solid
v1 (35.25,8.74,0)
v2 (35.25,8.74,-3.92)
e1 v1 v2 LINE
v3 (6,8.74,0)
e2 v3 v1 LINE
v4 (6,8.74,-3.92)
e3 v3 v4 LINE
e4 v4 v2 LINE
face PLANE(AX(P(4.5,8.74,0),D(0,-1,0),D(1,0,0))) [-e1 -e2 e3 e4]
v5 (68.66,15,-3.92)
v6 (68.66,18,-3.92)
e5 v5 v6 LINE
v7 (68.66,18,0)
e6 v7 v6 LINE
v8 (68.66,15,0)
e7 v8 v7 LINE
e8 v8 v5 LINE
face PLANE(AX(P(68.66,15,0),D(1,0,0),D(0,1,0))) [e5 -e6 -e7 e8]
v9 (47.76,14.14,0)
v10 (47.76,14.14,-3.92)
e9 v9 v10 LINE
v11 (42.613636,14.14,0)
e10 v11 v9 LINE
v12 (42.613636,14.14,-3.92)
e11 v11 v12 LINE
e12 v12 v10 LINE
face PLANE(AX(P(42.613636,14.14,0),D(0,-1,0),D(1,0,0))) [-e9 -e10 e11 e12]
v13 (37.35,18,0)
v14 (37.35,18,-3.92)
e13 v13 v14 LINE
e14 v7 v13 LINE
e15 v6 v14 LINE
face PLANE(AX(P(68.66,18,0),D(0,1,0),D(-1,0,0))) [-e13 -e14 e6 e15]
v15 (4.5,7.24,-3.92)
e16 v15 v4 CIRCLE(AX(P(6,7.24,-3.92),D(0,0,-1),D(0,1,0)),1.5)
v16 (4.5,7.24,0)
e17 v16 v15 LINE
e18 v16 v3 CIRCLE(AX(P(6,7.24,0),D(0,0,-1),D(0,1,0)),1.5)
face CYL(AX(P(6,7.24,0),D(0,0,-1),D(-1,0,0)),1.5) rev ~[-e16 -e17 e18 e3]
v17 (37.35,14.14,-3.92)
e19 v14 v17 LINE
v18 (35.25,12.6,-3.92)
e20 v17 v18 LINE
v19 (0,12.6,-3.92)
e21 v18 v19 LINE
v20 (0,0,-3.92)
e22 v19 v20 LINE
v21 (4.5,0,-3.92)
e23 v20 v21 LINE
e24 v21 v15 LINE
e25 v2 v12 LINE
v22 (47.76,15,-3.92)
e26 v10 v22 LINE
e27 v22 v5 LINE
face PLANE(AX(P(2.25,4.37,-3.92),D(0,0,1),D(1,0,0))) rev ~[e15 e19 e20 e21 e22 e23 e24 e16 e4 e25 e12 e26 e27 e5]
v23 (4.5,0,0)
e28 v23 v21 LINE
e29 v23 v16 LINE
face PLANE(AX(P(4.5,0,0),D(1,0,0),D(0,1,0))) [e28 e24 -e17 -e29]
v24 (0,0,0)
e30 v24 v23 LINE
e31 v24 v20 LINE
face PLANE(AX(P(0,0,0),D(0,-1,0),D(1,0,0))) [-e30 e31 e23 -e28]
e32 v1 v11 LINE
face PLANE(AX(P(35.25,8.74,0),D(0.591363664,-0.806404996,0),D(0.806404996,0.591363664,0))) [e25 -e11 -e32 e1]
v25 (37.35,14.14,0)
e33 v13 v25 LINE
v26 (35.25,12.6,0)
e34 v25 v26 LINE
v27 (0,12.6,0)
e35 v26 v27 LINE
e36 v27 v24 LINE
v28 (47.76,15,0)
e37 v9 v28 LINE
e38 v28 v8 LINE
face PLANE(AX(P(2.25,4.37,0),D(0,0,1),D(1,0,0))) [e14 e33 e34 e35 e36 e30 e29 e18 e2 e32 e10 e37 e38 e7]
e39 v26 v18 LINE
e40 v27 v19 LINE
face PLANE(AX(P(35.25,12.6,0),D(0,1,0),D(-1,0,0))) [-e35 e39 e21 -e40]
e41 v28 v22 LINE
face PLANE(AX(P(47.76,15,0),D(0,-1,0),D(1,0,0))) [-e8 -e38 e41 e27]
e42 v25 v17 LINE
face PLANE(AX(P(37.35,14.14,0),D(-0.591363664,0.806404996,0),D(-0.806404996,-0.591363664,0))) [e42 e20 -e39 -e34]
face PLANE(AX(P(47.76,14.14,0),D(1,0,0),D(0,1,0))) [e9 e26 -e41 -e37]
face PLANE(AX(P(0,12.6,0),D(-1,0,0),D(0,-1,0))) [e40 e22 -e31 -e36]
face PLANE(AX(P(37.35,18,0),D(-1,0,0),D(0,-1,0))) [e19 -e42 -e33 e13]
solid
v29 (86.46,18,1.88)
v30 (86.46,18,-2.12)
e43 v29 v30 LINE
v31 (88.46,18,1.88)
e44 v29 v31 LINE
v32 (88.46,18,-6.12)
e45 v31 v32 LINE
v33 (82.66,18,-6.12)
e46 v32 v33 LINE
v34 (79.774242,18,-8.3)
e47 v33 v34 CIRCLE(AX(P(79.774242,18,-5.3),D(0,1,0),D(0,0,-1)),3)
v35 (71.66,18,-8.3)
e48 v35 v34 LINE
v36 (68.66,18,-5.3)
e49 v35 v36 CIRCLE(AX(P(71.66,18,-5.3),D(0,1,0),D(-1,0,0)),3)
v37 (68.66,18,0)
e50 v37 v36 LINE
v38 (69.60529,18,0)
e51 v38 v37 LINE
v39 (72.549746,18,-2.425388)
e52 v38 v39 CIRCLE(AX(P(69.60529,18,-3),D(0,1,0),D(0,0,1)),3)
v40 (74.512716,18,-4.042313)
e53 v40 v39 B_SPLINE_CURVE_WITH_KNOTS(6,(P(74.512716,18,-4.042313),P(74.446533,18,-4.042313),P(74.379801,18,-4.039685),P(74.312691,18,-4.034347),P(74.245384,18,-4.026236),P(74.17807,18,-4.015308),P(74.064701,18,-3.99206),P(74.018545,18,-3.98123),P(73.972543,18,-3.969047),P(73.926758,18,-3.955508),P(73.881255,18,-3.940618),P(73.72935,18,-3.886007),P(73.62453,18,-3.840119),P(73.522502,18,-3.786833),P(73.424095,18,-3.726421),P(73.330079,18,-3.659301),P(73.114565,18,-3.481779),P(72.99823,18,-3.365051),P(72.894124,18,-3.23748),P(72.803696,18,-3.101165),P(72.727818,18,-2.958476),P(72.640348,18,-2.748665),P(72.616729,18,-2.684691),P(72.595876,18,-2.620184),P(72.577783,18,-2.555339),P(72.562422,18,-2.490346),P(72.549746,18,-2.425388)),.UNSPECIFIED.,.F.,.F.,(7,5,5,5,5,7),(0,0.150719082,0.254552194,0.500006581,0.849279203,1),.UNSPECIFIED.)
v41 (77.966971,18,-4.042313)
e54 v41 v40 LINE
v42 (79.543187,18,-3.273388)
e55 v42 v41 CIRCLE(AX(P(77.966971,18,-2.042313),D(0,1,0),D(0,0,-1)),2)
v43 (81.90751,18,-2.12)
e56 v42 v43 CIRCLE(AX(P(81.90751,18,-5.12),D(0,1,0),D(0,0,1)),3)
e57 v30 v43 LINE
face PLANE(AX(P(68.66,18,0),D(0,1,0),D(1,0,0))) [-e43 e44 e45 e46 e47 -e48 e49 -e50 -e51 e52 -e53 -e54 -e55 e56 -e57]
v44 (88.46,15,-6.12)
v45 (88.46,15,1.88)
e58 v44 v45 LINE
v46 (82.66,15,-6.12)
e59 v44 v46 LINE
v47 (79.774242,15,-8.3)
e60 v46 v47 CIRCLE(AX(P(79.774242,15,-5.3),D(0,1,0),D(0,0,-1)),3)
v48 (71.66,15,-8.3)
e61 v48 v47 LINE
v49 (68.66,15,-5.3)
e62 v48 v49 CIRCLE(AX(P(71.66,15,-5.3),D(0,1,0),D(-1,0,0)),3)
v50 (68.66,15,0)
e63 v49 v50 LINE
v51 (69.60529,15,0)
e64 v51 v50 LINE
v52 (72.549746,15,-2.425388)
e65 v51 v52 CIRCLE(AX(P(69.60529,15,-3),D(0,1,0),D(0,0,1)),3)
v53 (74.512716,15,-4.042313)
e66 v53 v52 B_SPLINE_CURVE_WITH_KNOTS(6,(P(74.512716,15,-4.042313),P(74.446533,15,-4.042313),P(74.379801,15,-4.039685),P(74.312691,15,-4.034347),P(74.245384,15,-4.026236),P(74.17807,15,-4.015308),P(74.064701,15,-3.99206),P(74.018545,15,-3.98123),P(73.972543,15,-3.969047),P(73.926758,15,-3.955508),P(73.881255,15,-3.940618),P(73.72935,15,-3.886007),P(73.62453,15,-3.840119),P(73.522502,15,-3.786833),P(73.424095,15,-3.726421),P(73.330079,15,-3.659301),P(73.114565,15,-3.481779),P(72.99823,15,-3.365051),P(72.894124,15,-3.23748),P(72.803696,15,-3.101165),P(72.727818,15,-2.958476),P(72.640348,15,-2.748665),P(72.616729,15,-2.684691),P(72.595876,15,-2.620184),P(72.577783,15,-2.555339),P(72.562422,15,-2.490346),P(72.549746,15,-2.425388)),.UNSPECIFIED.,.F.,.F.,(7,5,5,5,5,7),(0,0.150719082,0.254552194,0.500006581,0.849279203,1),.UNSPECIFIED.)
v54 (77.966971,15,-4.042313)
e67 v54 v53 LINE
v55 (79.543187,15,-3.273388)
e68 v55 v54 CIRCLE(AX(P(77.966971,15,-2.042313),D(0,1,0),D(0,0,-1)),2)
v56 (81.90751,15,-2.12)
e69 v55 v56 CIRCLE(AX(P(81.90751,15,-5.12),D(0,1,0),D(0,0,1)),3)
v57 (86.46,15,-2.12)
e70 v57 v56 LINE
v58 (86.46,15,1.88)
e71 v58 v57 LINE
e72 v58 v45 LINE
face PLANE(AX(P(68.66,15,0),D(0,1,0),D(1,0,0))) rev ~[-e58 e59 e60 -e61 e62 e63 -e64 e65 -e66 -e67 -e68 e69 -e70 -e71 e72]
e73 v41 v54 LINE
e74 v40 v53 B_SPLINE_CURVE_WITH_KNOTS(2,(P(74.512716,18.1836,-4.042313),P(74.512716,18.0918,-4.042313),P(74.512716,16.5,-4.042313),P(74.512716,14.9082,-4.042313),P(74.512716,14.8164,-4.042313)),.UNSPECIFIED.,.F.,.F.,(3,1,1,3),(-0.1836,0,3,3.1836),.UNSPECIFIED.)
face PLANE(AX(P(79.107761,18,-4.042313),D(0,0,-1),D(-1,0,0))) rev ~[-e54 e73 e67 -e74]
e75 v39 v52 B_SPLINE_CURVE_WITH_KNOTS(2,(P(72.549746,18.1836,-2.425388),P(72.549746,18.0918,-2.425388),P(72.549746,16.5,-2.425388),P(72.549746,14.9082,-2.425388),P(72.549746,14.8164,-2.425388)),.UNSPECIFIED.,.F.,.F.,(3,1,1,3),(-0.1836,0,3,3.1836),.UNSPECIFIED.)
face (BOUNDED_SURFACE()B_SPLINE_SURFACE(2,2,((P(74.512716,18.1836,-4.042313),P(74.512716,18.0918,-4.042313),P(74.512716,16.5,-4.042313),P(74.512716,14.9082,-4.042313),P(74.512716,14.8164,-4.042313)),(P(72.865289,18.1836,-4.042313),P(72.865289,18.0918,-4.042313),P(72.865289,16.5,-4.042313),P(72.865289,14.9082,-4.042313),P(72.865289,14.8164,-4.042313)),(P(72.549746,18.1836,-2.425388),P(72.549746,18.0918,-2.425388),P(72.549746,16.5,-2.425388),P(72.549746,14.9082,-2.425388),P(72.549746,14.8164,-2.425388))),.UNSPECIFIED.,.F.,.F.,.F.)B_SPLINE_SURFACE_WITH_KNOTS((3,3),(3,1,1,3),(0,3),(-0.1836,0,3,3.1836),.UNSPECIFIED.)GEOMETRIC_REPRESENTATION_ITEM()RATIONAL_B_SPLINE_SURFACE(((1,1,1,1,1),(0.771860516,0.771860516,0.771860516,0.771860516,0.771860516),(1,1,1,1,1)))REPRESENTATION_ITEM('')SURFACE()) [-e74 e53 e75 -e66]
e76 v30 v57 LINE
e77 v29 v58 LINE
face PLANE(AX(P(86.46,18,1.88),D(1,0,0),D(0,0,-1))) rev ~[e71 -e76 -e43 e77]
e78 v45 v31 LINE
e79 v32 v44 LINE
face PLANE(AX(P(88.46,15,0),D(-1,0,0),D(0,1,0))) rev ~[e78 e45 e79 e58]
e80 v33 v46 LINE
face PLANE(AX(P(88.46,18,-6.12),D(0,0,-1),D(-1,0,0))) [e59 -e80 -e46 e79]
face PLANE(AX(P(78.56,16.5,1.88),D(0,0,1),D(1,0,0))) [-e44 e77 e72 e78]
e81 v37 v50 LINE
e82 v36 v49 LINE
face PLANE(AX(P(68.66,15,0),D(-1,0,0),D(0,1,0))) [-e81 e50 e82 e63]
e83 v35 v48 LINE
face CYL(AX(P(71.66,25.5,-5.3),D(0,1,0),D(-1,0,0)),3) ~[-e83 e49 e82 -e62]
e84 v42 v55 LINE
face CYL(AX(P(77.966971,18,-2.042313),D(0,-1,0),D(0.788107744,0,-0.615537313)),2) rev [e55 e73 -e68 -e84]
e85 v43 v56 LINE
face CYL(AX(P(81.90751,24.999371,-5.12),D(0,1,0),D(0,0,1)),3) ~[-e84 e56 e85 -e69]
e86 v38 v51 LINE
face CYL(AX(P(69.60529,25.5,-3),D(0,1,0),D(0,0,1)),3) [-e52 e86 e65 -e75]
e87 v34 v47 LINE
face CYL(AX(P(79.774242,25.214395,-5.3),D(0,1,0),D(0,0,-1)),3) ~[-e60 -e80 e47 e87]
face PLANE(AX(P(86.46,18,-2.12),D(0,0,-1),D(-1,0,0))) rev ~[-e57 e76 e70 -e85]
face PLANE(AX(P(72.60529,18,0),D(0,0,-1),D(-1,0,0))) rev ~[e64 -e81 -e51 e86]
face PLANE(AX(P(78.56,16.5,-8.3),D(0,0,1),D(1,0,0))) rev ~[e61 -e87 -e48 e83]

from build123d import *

# Parameters (mm, degrees)
F0_W        = 4.5
F0_H        = 8.74
F0_W_2      = 20.9
F0_H_2      = 3
F1_DEPTH    = 3.92
F0_W_3      = 19.8
F2_DEPTH    = 8.3
F3_DEPTH    = 1.88
F4_W        = 5.8
F4_H        = 2.18
F5_DEPTH    = 25
F6_T1_DEPTH = 18
F6_T3_DEPTH = 17.4287906631
F6_T5_DEPTH = 16.9987425023
F7_R        = 2
F8_R        = 1.5


# Not quite as in the source:
# - a fillet or chamfer that OpenCascade refuses, or shapes differently, is made with other operations: its cross-section is extruded or revolved along the edge and cut away or added
# - a feature names something its author has since deleted; it is built from what else it names


with BuildPart() as f1:
    # F0 (on Top) → F1 (new body)
    with BuildSketch(Plane.XY):
        with Locations((2.25, 4.37)):
            Rectangle(F0_W, F0_H)
        Polygon((0, 12.6), (0, 8.74), (4.5, 8.74), (35.25, 8.74), (35.25, 12.6), align=None)
        Polygon((35.25, 12.6), (35.25, 8.74), (42.6136363636, 14.14), (37.35, 14.14), align=None)
        Polygon((37.35, 14.14), (42.6136363636, 14.14), (47.76, 14.14), (47.76, 15), (47.76, 18), (37.35, 18), align=None)
        with Locations((58.21, 16.5)):
            Rectangle(F0_W_2, F0_H_2)
    extrude(amount=-F1_DEPTH)

    # F8
    f8_edges = [f1.edges().sort_by_distance(p)[0] for p in [
        (4.5, 8.74, -1.96),
    ]]
    fillet(f8_edges, radius=F8_R)


with BuildPart() as f2:
    # F0 (on Top) → F2 (new body)
    with BuildSketch(Plane.XY):
        with Locations((78.56, 16.5)):
            Rectangle(F0_W_3, F0_H_2)
    extrude(amount=-F2_DEPTH)

    # F0 (on Top) → F3 (join)
    with BuildSketch(Plane.XY):
        with Locations((78.56, 16.5)):
            Rectangle(F0_W_3, F0_H_2)
    extrude(amount=F3_DEPTH)

    # F4 (on face) → F5 (cut)
    with BuildSketch(Plane(origin=(0, 18, 0), x_dir=(-1, 0, 0), z_dir=(0, 1, 0))):
        with Locations((-85.56, -7.21)):
            Rectangle(F4_W, F4_H)
        Polygon((-68.66, 1.88), (-86.46, 1.88), (-86.46, -2.12), (-82.66, -2.12), (-79.1077613831, -2.12), (-79.1077613831, -4.0423134342), (-72.6052895188, -4.0423134342), (-72.6052895188, 0), (-68.66, 0), align=None)
    extrude(amount=-F5_DEPTH, mode=Mode.SUBTRACT)

    # F6: fillet of radius 3 on 4 edges, made by hand

    # F6_s2 → F6_t1 (cut)
    with BuildSketch(Plane.XZ.offset(-25.5)):
        with BuildLine():
            ThreePointArc((68.66, -5.3), (69.5386796564, -7.4213203436), (71.66, -8.3))
            Line((71.66, -8.3), (68.66, -8.3))
            Line((68.66, -8.3), (68.66, -5.3))
        make_face()
        with BuildLine():
            ThreePointArc((69.6052895188, 0), (71.7266098624, -0.8786796564), (72.6052895188, -3))
            Line((72.6052895188, -3), (72.6052895188, 0))
            Line((72.6052895188, 0), (69.6052895188, 0))
        make_face()
    extrude(amount=F6_T1_DEPTH, mode=Mode.SUBTRACT)

    # F6_s4 → F6_t3 (cut)
    with BuildSketch(Plane.XZ.offset(-25.2143953316)):
        with BuildLine():
            ThreePointArc((79.7742418674, -8.3), (81.5825559994, -7.6937418407), (82.66, -6.12))
            Line((82.66, -6.12), (82.66, -8.3))
            Line((82.66, -8.3), (79.7742418674, -8.3))
        make_face()
    extrude(amount=F6_T3_DEPTH, mode=Mode.SUBTRACT)

    # F6_s6 → F6_t5 (cut)
    with BuildSketch(Plane.XZ.offset(-24.9993712512)):
        with BuildLine():
            ThreePointArc((81.9075098835, -2.12), (80.2094315133, -2.6468380868), (79.1077613831, -4.0423134342))
            Line((79.1077613831, -4.0423134342), (79.1077613831, -2.12))
            Line((79.1077613831, -2.12), (81.9075098835, -2.12))
        make_face()
    extrude(amount=F6_T5_DEPTH, mode=Mode.SUBTRACT)

    # F7
    f7_edges = [f2.edges().sort_by_distance(p)[0] for p in [
        (72.60529, 16.5, -4.042313),
        (79.107761, 16.5, -4.042313),
    ]]
    fillet(f7_edges, radius=F7_R)


solid = Compound([f1.part, f2.part])
